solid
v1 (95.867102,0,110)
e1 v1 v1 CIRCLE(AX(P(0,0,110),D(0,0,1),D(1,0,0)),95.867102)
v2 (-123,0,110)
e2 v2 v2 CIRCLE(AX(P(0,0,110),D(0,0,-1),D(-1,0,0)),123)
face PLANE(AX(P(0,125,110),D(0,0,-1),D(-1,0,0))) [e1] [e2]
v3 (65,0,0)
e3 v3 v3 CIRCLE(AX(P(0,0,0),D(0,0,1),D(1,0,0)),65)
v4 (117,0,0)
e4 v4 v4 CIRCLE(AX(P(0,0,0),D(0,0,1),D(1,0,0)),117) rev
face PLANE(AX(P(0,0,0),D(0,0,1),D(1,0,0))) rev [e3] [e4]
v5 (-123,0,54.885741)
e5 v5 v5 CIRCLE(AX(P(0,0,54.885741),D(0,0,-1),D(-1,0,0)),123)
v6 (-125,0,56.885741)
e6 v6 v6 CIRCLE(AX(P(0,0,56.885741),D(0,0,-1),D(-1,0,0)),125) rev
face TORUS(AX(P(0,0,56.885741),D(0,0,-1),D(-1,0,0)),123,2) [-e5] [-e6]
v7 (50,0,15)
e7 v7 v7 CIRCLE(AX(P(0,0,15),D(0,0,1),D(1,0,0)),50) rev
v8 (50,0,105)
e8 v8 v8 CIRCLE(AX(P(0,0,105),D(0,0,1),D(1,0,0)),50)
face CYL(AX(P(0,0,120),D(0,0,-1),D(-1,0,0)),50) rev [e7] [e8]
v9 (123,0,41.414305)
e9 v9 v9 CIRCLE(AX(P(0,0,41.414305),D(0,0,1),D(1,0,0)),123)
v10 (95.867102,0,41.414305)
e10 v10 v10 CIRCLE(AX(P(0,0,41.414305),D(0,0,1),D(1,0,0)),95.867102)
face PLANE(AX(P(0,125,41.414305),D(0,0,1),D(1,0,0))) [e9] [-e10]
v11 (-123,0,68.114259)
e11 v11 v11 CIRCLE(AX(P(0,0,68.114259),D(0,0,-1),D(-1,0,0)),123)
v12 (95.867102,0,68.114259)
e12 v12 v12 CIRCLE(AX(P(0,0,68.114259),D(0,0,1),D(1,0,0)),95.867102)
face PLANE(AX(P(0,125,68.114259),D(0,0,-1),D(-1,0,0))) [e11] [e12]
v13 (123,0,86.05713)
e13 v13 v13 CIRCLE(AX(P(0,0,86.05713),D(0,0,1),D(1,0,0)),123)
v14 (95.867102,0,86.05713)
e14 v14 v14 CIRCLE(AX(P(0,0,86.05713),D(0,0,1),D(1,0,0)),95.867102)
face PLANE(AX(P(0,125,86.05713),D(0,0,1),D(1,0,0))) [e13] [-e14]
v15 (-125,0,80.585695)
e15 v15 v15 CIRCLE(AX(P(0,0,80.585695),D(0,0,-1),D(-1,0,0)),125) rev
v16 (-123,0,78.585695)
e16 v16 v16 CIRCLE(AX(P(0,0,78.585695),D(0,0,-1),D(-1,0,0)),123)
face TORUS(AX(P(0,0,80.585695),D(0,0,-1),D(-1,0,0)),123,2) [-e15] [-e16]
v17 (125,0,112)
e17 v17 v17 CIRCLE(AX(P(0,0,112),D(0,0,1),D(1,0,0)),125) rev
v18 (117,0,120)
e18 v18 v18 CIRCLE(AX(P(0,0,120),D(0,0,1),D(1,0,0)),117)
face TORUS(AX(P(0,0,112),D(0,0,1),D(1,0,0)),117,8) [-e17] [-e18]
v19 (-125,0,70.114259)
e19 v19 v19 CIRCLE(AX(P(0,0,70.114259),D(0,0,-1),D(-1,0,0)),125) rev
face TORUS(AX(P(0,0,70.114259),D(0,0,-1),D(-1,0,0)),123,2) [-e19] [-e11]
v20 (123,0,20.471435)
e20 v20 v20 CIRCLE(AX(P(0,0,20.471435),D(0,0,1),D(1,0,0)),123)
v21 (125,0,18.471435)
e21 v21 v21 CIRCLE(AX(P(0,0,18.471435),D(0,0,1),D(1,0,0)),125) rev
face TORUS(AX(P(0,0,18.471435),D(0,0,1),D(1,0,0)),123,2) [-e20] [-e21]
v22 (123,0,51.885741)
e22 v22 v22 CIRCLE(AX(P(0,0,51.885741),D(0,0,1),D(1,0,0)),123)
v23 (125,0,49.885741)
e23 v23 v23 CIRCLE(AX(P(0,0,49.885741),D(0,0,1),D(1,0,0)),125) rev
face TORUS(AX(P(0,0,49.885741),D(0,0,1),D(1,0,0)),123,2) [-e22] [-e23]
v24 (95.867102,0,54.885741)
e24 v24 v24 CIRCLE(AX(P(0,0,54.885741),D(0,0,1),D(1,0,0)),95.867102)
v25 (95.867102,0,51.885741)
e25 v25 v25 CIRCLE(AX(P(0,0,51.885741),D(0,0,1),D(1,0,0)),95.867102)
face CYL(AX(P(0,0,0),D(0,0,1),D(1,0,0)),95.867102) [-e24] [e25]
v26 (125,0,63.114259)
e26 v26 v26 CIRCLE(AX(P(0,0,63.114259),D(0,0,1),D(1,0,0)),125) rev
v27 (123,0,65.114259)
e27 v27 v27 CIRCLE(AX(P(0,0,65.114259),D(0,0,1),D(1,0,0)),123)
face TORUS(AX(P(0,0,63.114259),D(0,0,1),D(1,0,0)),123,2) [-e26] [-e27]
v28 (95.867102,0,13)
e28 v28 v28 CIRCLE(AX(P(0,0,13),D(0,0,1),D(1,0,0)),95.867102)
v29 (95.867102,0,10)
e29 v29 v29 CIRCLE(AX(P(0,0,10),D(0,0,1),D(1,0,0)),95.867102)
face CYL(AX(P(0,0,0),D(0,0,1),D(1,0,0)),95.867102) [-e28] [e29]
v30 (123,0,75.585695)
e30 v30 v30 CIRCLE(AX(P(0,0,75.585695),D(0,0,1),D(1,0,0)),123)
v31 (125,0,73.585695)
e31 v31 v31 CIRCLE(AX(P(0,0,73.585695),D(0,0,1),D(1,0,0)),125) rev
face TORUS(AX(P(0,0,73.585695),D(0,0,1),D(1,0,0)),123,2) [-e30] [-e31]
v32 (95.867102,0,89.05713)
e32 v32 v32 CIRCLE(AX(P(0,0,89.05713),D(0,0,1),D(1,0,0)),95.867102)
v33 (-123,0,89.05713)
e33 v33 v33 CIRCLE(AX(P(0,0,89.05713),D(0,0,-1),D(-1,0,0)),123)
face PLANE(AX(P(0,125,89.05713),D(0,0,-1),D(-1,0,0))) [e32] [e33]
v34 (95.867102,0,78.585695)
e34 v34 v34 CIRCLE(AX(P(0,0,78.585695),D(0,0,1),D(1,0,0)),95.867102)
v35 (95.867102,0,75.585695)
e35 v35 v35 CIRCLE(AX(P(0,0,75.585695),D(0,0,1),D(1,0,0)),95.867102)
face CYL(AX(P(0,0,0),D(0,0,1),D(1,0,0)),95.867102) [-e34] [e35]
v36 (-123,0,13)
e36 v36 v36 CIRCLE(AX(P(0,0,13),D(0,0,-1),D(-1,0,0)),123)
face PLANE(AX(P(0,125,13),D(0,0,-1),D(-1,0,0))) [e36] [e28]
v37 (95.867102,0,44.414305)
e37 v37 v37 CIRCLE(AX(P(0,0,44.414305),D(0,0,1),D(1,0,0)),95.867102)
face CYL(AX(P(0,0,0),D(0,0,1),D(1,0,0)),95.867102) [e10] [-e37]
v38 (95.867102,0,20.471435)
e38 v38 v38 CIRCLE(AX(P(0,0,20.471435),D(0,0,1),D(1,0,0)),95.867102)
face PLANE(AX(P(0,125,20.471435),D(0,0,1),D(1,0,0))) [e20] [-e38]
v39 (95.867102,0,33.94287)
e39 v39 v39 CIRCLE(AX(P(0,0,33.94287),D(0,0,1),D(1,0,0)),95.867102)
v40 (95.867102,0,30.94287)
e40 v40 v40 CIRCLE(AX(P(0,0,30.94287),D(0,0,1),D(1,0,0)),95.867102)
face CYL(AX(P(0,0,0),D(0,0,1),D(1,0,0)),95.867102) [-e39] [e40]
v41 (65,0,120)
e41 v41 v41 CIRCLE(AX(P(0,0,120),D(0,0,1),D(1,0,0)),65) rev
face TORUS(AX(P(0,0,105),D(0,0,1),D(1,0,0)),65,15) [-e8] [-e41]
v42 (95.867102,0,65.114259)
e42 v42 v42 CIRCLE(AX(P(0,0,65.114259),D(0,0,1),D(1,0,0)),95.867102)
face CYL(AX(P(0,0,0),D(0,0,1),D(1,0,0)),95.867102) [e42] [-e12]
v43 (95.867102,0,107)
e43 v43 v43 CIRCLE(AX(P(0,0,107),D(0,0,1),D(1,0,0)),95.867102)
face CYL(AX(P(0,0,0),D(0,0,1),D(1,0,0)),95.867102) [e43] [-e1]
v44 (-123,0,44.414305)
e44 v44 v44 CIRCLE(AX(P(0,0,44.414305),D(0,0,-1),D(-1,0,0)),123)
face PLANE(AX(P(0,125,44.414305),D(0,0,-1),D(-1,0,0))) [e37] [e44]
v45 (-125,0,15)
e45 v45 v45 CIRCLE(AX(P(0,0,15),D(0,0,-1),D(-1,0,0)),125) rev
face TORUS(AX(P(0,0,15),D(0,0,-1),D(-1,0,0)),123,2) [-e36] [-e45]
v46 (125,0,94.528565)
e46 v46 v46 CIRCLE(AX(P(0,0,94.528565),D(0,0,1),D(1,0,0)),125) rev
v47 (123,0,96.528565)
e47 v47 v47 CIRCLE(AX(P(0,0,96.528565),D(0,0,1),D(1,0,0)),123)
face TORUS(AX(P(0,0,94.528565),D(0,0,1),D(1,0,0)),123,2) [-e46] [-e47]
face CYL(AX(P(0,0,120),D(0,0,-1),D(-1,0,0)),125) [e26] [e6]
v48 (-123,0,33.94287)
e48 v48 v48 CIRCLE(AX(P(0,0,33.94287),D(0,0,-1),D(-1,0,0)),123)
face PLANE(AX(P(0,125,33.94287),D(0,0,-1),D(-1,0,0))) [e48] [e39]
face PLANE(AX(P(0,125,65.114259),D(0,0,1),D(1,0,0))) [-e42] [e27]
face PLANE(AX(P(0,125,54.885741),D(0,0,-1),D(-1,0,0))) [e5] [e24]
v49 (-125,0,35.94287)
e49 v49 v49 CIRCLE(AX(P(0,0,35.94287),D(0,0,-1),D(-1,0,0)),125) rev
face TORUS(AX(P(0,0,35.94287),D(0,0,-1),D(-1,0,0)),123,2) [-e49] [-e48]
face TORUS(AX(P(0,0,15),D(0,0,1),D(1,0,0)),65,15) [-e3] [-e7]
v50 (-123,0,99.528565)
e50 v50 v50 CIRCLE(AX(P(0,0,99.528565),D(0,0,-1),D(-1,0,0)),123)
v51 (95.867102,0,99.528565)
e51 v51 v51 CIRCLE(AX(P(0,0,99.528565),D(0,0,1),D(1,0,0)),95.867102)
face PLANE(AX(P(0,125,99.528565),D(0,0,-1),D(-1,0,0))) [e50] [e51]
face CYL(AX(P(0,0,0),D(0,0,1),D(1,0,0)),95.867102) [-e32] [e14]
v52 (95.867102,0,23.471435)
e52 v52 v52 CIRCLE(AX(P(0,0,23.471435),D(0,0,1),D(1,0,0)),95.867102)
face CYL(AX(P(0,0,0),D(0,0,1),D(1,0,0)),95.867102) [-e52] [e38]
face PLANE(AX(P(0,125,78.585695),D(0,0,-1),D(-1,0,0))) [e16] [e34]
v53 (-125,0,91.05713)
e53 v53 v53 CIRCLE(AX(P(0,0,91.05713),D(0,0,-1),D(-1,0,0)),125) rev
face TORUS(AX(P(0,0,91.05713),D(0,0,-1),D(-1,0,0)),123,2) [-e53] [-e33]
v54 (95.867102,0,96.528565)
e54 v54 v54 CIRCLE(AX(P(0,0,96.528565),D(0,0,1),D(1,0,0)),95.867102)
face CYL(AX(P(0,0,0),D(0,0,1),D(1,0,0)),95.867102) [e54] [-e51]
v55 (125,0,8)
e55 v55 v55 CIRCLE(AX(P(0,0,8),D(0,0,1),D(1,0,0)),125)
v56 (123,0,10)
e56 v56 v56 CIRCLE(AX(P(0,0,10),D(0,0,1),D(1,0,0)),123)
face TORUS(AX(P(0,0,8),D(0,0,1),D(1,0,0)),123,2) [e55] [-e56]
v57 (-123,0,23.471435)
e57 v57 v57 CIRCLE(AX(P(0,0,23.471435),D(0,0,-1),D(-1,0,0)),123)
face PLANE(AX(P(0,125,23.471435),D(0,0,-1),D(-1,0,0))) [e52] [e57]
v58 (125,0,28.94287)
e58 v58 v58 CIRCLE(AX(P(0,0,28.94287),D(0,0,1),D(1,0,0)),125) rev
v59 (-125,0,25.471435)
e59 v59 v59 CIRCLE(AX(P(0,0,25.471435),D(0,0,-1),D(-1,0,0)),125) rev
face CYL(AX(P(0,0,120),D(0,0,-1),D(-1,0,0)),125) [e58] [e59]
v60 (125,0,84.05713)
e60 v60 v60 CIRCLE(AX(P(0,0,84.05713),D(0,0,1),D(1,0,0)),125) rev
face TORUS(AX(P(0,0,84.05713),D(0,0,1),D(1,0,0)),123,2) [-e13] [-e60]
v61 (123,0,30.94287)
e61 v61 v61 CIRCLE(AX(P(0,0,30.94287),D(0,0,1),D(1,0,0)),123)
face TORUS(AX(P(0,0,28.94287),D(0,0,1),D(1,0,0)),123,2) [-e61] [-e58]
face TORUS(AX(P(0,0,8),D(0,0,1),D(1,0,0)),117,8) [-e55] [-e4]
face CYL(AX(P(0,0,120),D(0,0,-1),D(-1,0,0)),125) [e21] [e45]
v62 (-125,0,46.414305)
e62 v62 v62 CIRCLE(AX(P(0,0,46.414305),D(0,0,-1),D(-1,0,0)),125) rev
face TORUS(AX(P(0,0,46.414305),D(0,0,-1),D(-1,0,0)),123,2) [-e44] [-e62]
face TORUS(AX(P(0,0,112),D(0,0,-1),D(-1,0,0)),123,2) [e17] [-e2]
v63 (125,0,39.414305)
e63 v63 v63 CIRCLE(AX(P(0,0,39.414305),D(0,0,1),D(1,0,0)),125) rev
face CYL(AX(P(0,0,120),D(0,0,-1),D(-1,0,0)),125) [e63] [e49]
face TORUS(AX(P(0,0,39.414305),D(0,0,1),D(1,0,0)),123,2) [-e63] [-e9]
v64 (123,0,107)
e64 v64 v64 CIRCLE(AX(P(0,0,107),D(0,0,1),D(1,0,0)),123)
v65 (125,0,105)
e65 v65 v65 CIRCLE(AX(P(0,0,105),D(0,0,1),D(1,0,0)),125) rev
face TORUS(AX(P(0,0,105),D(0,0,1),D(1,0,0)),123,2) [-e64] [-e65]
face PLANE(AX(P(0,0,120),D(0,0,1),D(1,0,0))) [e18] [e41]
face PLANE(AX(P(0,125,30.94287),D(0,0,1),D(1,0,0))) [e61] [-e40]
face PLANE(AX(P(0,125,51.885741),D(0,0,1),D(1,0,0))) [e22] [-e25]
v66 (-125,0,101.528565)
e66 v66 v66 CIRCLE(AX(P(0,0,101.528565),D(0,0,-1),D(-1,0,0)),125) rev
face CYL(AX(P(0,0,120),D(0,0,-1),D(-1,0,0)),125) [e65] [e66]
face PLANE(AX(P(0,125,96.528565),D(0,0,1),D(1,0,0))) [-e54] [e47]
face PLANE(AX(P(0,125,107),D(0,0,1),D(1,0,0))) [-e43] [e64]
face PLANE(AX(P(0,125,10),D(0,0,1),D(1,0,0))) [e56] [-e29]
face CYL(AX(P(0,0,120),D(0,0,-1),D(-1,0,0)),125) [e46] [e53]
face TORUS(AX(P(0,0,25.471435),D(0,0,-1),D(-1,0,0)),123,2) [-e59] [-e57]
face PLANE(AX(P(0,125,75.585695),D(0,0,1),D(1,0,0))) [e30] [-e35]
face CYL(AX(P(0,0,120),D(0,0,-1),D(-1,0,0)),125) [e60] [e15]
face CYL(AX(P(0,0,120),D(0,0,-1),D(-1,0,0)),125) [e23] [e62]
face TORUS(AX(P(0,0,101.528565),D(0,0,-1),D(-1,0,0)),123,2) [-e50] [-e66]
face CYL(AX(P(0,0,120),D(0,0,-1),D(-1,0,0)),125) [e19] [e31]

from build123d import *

# Parameters (mm, degrees)
SKETCH1_R           = 125
SKETCH1_R_2         = 50
BOSS_EXTRUDE1_DEPTH = 120
SKETCH5_W           = 3
SKETCH5_H           = 29.132897838
FILLET1_R           = 8
FILLET2_R           = 15
FILLET3_R           = 2


with BuildPart() as part:
    # Sketch1 → Boss-Extrude1 (new body)
    with BuildSketch(Plane.XY):
        Circle(SKETCH1_R)
        Circle(SKETCH1_R_2, mode=Mode.SUBTRACT)
    extrude(amount=BOSS_EXTRUDE1_DEPTH)

    # Sketch5 → Cut-Revolve1 (revolve, cut)
    with BuildSketch(Plane(origin=(0, 0, 0), x_dir=(0, 0, -1), z_dir=(1, 0, 0)), mode=Mode.PRIVATE) as cut_revolve1_sk:
        with Locations((-108.5, 110.433551081)):
            Rectangle(SKETCH5_W, SKETCH5_H)
        with Locations((-98.028564865, 110.433551081)):
            Rectangle(SKETCH5_W, SKETCH5_H)
        with Locations((-87.557129731, 110.433551081)):
            Rectangle(SKETCH5_W, SKETCH5_H)
        with Locations((-77.085694596, 110.433551081)):
            Rectangle(SKETCH5_W, SKETCH5_H)
        with Locations((-66.614259462, 110.433551081)):
            Rectangle(SKETCH5_W, SKETCH5_H)
        with Locations((-53.385740538, 110.433551081)):
            Rectangle(SKETCH5_W, SKETCH5_H)
        with Locations((-42.914305404, 110.433551081)):
            Rectangle(SKETCH5_W, SKETCH5_H)
        with Locations((-32.442870269, 110.433551081)):
            Rectangle(SKETCH5_W, SKETCH5_H)
        with Locations((-21.971435135, 110.433551081)):
            Rectangle(SKETCH5_W, SKETCH5_H)
        with Locations((-11.5, 110.433551081)):
            Rectangle(SKETCH5_W, SKETCH5_H)
    revolve(cut_revolve1_sk.sketch.rotate(Axis((0, 0, 0), (0, 0, -1)), 90), axis=Axis((0, 0, 0), (0, 0, -1)), mode=Mode.SUBTRACT)

    # Fillet1
    fillet1_edges = [part.edges().sort_by_distance(p)[0] for p in [
        (-125, 0, 0),
        (-125, 0, 120),
    ]]
    fillet(fillet1_edges, radius=FILLET1_R)

    # Fillet2
    fillet2_edges = [part.edges().sort_by_distance(p)[0] for p in [
        (-50, 0, 0),
        (-50, 0, 120),
    ]]
    fillet(fillet2_edges, radius=FILLET2_R)

    # Fillet3
    fillet3_edges = [part.edges().sort_by_distance(p)[0] for p in [
        (-125, 0, 110),
        (-125, 0, 107),
        (-125, 0, 96.528564865),
        (-125, 0, 99.528564865),
        (-125, 0, 86.057129731),
        (-125, 0, 89.057129731),
        (-125, 0, 75.585694596),
        (-125, 0, 78.585694596),
        (-125, 0, 65.114259462),
        (-125, 0, 68.114259462),
        (-125, 0, 54.885740538),
        (-125, 0, 51.885740538),
        (-125, 0, 44.414305404),
        (-125, 0, 41.414305404),
        (-125, 0, 33.942870269),
        (-125, 0, 30.942870269),
        (-125, 0, 23.471435135),
        (-125, 0, 20.471435135),
        (-125, 0, 10),
        (-125, 0, 13),
    ]]
    fillet(fillet3_edges, radius=FILLET3_R - 0.0001)  # a hair under: the kernel refuses the full size


solid = part.part
